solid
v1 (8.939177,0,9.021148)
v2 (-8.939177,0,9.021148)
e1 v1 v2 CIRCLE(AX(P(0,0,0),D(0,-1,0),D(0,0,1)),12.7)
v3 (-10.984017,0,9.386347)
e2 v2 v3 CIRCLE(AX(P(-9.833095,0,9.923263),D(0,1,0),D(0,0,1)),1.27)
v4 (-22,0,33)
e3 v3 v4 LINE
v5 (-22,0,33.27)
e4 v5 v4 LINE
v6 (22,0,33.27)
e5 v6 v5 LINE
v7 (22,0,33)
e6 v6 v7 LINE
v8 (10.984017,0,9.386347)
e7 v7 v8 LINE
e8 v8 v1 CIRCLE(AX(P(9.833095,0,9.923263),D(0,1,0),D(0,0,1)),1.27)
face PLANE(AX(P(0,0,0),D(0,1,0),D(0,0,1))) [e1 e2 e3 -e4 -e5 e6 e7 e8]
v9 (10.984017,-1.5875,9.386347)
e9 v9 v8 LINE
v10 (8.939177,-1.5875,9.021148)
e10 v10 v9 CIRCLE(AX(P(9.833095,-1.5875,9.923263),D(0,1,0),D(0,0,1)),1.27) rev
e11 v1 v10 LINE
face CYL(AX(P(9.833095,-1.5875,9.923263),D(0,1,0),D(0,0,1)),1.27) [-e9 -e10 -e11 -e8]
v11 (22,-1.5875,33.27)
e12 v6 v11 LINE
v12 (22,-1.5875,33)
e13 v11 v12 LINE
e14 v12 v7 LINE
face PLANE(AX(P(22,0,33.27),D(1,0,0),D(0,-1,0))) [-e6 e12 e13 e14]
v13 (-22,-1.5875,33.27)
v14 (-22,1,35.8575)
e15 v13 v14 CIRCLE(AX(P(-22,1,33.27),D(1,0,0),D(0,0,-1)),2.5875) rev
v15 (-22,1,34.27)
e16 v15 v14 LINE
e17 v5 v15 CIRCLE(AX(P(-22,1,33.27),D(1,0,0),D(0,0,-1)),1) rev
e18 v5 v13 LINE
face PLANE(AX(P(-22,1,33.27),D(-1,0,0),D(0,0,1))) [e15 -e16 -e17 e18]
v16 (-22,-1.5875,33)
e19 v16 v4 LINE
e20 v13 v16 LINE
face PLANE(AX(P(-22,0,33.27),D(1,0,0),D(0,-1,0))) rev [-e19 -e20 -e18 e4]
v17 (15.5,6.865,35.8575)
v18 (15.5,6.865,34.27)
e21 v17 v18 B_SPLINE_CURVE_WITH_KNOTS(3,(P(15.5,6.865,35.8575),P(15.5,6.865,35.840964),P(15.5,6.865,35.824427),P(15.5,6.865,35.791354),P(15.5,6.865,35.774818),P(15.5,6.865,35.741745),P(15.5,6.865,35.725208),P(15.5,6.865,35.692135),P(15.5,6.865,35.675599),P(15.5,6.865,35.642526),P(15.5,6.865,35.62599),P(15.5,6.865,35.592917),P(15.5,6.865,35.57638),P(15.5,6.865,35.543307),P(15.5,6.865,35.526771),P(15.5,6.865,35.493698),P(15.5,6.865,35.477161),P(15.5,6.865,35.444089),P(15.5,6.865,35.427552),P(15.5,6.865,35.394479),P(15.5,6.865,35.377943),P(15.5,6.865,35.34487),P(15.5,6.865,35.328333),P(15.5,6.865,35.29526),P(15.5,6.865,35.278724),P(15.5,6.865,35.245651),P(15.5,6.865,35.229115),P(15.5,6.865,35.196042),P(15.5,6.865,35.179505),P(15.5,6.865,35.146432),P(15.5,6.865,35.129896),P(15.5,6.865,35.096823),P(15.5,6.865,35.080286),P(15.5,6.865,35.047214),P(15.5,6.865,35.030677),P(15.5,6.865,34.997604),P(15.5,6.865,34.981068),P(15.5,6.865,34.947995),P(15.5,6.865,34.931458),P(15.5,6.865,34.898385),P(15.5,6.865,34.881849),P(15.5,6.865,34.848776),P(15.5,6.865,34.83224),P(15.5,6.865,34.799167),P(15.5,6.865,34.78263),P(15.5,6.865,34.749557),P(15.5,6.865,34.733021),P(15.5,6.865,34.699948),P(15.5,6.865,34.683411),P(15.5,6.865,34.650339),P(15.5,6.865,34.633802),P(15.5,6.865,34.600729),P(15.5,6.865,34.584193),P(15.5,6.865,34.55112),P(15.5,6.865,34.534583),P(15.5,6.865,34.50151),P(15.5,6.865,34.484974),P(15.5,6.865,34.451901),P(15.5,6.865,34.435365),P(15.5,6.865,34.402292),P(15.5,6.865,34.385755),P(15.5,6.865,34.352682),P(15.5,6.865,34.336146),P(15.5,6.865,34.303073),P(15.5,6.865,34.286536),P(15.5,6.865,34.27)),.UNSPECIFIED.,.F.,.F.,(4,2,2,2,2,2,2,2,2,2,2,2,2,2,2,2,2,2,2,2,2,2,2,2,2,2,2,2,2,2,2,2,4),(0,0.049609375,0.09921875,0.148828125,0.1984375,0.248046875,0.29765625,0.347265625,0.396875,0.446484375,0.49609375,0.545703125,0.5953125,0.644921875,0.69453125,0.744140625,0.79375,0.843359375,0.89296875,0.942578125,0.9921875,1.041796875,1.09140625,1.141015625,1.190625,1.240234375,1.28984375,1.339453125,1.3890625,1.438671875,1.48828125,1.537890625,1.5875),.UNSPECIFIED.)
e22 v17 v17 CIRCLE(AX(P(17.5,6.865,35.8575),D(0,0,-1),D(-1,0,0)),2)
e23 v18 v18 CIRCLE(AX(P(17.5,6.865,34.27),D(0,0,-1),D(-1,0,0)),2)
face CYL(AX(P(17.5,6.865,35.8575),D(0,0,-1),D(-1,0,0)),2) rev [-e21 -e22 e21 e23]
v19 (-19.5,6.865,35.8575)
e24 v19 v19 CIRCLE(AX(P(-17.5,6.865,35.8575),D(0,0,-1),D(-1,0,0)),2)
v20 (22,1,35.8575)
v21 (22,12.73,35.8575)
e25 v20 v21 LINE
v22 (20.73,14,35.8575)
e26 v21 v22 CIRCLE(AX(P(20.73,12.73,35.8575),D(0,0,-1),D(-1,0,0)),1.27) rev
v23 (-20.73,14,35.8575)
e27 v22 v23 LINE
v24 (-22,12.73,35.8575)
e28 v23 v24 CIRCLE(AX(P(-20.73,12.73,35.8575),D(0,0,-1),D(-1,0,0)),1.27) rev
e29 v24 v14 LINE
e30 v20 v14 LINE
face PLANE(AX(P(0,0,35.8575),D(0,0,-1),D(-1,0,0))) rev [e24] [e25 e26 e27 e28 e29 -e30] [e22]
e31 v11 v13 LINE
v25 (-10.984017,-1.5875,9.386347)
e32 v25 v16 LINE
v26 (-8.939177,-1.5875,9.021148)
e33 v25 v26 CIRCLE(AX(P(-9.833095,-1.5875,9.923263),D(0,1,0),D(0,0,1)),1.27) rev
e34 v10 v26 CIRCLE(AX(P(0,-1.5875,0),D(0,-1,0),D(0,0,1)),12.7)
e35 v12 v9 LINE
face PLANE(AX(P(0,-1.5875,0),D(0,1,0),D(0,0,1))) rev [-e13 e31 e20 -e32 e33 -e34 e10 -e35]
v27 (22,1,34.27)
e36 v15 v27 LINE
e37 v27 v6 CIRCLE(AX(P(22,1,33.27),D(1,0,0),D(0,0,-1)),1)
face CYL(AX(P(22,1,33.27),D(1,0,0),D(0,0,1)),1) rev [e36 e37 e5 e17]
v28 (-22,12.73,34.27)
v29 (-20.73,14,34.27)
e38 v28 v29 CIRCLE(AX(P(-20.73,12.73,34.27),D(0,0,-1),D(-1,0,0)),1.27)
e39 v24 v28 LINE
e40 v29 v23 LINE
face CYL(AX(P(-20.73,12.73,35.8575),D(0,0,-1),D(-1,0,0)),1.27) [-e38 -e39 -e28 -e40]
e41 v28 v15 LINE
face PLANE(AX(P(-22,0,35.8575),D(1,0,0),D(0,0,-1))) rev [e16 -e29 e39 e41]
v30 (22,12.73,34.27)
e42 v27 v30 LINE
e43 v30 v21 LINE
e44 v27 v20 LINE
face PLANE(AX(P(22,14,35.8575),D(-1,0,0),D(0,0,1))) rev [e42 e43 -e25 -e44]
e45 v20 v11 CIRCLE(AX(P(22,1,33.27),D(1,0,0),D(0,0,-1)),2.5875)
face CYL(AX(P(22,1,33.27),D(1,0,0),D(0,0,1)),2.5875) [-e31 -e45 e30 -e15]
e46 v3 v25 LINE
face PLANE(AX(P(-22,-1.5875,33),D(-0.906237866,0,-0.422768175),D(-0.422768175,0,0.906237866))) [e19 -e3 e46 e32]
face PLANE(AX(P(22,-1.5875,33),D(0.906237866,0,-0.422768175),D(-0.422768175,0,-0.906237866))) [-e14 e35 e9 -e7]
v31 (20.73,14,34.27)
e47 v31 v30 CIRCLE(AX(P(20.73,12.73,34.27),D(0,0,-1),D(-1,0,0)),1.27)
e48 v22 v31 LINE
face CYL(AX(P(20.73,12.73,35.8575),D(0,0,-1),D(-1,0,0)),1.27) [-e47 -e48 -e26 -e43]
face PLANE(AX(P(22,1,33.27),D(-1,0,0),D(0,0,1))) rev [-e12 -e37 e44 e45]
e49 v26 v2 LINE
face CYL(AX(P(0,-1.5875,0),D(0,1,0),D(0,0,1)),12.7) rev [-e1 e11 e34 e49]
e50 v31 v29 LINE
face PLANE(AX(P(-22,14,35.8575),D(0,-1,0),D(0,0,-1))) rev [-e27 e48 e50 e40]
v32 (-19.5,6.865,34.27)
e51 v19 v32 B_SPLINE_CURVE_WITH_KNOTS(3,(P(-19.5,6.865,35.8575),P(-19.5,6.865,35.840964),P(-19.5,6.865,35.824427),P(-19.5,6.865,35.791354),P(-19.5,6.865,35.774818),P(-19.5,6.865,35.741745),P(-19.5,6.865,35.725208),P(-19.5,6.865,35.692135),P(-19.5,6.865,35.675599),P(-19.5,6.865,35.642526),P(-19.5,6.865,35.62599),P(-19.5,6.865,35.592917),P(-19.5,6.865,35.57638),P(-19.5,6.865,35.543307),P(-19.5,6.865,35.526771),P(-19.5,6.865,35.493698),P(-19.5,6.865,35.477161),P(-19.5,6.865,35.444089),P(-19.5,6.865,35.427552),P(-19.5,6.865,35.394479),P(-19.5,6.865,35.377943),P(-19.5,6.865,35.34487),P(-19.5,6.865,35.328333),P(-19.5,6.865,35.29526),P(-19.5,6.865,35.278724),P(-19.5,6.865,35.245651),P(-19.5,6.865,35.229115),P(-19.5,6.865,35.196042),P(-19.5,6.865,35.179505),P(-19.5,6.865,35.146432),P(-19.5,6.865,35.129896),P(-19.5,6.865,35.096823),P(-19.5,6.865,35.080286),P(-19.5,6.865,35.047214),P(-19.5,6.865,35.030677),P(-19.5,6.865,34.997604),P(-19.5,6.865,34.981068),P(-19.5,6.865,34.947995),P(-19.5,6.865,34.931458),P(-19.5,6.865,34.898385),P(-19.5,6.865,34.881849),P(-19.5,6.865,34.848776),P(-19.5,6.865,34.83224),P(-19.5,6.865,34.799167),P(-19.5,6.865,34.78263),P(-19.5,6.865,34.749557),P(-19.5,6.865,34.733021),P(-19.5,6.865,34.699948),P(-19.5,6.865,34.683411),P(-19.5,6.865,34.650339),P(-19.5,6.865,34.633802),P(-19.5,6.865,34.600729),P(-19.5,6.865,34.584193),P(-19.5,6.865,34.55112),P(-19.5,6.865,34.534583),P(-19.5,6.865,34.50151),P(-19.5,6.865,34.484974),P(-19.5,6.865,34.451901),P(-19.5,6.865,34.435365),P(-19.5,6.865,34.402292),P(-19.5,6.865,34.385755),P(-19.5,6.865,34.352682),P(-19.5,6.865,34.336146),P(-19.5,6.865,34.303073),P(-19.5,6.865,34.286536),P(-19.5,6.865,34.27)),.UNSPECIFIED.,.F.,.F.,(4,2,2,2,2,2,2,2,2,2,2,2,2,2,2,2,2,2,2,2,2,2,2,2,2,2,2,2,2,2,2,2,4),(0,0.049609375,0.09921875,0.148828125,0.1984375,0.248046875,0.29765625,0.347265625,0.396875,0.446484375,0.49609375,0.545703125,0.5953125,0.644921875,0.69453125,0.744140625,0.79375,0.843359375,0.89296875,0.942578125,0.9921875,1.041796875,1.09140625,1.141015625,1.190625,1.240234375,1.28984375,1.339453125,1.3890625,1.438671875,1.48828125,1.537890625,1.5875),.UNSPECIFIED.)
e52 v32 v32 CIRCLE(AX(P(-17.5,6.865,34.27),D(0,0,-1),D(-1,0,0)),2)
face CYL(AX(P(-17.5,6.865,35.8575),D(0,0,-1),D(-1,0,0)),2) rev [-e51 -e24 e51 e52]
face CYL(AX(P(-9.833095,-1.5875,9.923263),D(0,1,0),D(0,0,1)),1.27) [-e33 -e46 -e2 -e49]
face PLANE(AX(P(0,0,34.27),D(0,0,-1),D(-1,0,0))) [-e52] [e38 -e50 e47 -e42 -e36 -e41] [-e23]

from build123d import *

# Parameters (mm, degrees)
BASE_FLANGE2_DEPTH = 1.5875
EDGE_FLANGE2_DEPTH = 43.999999884
FILLET2_R          = 1.27
SKETCH21_R         = 2
CUT_EXTRUDE1_DEPTH = 37.554305105


# Sheet-metal steps are written as plain solids
with BuildPart() as part:
    # Sketch12 → Base-Flange2 (new body)
    with BuildSketch(Plane(origin=(0, 0, 0), x_dir=(1, 0, 0), z_dir=(0, 1, 0))):
        with BuildLine():
            Line((-21.999999942, -33), (0, -33))
            Line((0, -33), (21.999999942, -33))
            Line((21.999999942, -33), (10.16, -7.62))
            ThreePointArc((10.16, -7.62), (0, -12.7), (-10.16, -7.62))
            Line((-10.16, -7.62), (-21.999999942, -33))
        make_face()
    extrude(amount=-BASE_FLANGE2_DEPTH)

    # Edge-Flange2 section (across the edge) → Edge-Flange2 (add)
    with BuildSketch(Plane(origin=(-21.999999942, 0, 34.27), x_dir=(0, 0, -1), z_dir=(1, 0, 0))):
        with BuildLine():
            Line((-1.5875, 1), (-1.5875, 14))
            Line((-1.5875, 14), (0, 14))
            Line((0, 14), (0, 1))
            ThreePointArc((0, 1), (0.292893219, 0.292893219), (1, 0))
            Line((1, 0), (1.27, 0))
            Line((1.27, 0), (1.27, -1.5875))
            Line((1.27, -1.5875), (1, -1.5875))
            ThreePointArc((1, -1.5875), (-0.829638796, -0.829638796), (-1.5875, 1))
        make_face()
    extrude(amount=EDGE_FLANGE2_DEPTH)

    # Fillet2
    fillet2_edges = [part.edges().sort_by_distance(p)[0] for p in [
        (-21.999999942, 14, 35.06375),
        (21.999999942, 14, 35.06375),
        (-10.16, -0.79375, 7.62),
        (10.16, -0.79375, 7.62),
    ]]
    fillet(fillet2_edges, radius=FILLET2_R)

    # Sketch21 → Cut-Extrude1 (cut, through all)
    with BuildSketch(Plane(origin=(0, 0, 34.27), x_dir=(-1, 0, 0), z_dir=(0, 0, -1))):
        with Locations((-17.5, 6.865)):
            Circle(SKETCH21_R)
        with Locations((17.5, 6.865)):
            Circle(SKETCH21_R)
    extrude(amount=-CUT_EXTRUDE1_DEPTH, mode=Mode.SUBTRACT)


solid = part.part
